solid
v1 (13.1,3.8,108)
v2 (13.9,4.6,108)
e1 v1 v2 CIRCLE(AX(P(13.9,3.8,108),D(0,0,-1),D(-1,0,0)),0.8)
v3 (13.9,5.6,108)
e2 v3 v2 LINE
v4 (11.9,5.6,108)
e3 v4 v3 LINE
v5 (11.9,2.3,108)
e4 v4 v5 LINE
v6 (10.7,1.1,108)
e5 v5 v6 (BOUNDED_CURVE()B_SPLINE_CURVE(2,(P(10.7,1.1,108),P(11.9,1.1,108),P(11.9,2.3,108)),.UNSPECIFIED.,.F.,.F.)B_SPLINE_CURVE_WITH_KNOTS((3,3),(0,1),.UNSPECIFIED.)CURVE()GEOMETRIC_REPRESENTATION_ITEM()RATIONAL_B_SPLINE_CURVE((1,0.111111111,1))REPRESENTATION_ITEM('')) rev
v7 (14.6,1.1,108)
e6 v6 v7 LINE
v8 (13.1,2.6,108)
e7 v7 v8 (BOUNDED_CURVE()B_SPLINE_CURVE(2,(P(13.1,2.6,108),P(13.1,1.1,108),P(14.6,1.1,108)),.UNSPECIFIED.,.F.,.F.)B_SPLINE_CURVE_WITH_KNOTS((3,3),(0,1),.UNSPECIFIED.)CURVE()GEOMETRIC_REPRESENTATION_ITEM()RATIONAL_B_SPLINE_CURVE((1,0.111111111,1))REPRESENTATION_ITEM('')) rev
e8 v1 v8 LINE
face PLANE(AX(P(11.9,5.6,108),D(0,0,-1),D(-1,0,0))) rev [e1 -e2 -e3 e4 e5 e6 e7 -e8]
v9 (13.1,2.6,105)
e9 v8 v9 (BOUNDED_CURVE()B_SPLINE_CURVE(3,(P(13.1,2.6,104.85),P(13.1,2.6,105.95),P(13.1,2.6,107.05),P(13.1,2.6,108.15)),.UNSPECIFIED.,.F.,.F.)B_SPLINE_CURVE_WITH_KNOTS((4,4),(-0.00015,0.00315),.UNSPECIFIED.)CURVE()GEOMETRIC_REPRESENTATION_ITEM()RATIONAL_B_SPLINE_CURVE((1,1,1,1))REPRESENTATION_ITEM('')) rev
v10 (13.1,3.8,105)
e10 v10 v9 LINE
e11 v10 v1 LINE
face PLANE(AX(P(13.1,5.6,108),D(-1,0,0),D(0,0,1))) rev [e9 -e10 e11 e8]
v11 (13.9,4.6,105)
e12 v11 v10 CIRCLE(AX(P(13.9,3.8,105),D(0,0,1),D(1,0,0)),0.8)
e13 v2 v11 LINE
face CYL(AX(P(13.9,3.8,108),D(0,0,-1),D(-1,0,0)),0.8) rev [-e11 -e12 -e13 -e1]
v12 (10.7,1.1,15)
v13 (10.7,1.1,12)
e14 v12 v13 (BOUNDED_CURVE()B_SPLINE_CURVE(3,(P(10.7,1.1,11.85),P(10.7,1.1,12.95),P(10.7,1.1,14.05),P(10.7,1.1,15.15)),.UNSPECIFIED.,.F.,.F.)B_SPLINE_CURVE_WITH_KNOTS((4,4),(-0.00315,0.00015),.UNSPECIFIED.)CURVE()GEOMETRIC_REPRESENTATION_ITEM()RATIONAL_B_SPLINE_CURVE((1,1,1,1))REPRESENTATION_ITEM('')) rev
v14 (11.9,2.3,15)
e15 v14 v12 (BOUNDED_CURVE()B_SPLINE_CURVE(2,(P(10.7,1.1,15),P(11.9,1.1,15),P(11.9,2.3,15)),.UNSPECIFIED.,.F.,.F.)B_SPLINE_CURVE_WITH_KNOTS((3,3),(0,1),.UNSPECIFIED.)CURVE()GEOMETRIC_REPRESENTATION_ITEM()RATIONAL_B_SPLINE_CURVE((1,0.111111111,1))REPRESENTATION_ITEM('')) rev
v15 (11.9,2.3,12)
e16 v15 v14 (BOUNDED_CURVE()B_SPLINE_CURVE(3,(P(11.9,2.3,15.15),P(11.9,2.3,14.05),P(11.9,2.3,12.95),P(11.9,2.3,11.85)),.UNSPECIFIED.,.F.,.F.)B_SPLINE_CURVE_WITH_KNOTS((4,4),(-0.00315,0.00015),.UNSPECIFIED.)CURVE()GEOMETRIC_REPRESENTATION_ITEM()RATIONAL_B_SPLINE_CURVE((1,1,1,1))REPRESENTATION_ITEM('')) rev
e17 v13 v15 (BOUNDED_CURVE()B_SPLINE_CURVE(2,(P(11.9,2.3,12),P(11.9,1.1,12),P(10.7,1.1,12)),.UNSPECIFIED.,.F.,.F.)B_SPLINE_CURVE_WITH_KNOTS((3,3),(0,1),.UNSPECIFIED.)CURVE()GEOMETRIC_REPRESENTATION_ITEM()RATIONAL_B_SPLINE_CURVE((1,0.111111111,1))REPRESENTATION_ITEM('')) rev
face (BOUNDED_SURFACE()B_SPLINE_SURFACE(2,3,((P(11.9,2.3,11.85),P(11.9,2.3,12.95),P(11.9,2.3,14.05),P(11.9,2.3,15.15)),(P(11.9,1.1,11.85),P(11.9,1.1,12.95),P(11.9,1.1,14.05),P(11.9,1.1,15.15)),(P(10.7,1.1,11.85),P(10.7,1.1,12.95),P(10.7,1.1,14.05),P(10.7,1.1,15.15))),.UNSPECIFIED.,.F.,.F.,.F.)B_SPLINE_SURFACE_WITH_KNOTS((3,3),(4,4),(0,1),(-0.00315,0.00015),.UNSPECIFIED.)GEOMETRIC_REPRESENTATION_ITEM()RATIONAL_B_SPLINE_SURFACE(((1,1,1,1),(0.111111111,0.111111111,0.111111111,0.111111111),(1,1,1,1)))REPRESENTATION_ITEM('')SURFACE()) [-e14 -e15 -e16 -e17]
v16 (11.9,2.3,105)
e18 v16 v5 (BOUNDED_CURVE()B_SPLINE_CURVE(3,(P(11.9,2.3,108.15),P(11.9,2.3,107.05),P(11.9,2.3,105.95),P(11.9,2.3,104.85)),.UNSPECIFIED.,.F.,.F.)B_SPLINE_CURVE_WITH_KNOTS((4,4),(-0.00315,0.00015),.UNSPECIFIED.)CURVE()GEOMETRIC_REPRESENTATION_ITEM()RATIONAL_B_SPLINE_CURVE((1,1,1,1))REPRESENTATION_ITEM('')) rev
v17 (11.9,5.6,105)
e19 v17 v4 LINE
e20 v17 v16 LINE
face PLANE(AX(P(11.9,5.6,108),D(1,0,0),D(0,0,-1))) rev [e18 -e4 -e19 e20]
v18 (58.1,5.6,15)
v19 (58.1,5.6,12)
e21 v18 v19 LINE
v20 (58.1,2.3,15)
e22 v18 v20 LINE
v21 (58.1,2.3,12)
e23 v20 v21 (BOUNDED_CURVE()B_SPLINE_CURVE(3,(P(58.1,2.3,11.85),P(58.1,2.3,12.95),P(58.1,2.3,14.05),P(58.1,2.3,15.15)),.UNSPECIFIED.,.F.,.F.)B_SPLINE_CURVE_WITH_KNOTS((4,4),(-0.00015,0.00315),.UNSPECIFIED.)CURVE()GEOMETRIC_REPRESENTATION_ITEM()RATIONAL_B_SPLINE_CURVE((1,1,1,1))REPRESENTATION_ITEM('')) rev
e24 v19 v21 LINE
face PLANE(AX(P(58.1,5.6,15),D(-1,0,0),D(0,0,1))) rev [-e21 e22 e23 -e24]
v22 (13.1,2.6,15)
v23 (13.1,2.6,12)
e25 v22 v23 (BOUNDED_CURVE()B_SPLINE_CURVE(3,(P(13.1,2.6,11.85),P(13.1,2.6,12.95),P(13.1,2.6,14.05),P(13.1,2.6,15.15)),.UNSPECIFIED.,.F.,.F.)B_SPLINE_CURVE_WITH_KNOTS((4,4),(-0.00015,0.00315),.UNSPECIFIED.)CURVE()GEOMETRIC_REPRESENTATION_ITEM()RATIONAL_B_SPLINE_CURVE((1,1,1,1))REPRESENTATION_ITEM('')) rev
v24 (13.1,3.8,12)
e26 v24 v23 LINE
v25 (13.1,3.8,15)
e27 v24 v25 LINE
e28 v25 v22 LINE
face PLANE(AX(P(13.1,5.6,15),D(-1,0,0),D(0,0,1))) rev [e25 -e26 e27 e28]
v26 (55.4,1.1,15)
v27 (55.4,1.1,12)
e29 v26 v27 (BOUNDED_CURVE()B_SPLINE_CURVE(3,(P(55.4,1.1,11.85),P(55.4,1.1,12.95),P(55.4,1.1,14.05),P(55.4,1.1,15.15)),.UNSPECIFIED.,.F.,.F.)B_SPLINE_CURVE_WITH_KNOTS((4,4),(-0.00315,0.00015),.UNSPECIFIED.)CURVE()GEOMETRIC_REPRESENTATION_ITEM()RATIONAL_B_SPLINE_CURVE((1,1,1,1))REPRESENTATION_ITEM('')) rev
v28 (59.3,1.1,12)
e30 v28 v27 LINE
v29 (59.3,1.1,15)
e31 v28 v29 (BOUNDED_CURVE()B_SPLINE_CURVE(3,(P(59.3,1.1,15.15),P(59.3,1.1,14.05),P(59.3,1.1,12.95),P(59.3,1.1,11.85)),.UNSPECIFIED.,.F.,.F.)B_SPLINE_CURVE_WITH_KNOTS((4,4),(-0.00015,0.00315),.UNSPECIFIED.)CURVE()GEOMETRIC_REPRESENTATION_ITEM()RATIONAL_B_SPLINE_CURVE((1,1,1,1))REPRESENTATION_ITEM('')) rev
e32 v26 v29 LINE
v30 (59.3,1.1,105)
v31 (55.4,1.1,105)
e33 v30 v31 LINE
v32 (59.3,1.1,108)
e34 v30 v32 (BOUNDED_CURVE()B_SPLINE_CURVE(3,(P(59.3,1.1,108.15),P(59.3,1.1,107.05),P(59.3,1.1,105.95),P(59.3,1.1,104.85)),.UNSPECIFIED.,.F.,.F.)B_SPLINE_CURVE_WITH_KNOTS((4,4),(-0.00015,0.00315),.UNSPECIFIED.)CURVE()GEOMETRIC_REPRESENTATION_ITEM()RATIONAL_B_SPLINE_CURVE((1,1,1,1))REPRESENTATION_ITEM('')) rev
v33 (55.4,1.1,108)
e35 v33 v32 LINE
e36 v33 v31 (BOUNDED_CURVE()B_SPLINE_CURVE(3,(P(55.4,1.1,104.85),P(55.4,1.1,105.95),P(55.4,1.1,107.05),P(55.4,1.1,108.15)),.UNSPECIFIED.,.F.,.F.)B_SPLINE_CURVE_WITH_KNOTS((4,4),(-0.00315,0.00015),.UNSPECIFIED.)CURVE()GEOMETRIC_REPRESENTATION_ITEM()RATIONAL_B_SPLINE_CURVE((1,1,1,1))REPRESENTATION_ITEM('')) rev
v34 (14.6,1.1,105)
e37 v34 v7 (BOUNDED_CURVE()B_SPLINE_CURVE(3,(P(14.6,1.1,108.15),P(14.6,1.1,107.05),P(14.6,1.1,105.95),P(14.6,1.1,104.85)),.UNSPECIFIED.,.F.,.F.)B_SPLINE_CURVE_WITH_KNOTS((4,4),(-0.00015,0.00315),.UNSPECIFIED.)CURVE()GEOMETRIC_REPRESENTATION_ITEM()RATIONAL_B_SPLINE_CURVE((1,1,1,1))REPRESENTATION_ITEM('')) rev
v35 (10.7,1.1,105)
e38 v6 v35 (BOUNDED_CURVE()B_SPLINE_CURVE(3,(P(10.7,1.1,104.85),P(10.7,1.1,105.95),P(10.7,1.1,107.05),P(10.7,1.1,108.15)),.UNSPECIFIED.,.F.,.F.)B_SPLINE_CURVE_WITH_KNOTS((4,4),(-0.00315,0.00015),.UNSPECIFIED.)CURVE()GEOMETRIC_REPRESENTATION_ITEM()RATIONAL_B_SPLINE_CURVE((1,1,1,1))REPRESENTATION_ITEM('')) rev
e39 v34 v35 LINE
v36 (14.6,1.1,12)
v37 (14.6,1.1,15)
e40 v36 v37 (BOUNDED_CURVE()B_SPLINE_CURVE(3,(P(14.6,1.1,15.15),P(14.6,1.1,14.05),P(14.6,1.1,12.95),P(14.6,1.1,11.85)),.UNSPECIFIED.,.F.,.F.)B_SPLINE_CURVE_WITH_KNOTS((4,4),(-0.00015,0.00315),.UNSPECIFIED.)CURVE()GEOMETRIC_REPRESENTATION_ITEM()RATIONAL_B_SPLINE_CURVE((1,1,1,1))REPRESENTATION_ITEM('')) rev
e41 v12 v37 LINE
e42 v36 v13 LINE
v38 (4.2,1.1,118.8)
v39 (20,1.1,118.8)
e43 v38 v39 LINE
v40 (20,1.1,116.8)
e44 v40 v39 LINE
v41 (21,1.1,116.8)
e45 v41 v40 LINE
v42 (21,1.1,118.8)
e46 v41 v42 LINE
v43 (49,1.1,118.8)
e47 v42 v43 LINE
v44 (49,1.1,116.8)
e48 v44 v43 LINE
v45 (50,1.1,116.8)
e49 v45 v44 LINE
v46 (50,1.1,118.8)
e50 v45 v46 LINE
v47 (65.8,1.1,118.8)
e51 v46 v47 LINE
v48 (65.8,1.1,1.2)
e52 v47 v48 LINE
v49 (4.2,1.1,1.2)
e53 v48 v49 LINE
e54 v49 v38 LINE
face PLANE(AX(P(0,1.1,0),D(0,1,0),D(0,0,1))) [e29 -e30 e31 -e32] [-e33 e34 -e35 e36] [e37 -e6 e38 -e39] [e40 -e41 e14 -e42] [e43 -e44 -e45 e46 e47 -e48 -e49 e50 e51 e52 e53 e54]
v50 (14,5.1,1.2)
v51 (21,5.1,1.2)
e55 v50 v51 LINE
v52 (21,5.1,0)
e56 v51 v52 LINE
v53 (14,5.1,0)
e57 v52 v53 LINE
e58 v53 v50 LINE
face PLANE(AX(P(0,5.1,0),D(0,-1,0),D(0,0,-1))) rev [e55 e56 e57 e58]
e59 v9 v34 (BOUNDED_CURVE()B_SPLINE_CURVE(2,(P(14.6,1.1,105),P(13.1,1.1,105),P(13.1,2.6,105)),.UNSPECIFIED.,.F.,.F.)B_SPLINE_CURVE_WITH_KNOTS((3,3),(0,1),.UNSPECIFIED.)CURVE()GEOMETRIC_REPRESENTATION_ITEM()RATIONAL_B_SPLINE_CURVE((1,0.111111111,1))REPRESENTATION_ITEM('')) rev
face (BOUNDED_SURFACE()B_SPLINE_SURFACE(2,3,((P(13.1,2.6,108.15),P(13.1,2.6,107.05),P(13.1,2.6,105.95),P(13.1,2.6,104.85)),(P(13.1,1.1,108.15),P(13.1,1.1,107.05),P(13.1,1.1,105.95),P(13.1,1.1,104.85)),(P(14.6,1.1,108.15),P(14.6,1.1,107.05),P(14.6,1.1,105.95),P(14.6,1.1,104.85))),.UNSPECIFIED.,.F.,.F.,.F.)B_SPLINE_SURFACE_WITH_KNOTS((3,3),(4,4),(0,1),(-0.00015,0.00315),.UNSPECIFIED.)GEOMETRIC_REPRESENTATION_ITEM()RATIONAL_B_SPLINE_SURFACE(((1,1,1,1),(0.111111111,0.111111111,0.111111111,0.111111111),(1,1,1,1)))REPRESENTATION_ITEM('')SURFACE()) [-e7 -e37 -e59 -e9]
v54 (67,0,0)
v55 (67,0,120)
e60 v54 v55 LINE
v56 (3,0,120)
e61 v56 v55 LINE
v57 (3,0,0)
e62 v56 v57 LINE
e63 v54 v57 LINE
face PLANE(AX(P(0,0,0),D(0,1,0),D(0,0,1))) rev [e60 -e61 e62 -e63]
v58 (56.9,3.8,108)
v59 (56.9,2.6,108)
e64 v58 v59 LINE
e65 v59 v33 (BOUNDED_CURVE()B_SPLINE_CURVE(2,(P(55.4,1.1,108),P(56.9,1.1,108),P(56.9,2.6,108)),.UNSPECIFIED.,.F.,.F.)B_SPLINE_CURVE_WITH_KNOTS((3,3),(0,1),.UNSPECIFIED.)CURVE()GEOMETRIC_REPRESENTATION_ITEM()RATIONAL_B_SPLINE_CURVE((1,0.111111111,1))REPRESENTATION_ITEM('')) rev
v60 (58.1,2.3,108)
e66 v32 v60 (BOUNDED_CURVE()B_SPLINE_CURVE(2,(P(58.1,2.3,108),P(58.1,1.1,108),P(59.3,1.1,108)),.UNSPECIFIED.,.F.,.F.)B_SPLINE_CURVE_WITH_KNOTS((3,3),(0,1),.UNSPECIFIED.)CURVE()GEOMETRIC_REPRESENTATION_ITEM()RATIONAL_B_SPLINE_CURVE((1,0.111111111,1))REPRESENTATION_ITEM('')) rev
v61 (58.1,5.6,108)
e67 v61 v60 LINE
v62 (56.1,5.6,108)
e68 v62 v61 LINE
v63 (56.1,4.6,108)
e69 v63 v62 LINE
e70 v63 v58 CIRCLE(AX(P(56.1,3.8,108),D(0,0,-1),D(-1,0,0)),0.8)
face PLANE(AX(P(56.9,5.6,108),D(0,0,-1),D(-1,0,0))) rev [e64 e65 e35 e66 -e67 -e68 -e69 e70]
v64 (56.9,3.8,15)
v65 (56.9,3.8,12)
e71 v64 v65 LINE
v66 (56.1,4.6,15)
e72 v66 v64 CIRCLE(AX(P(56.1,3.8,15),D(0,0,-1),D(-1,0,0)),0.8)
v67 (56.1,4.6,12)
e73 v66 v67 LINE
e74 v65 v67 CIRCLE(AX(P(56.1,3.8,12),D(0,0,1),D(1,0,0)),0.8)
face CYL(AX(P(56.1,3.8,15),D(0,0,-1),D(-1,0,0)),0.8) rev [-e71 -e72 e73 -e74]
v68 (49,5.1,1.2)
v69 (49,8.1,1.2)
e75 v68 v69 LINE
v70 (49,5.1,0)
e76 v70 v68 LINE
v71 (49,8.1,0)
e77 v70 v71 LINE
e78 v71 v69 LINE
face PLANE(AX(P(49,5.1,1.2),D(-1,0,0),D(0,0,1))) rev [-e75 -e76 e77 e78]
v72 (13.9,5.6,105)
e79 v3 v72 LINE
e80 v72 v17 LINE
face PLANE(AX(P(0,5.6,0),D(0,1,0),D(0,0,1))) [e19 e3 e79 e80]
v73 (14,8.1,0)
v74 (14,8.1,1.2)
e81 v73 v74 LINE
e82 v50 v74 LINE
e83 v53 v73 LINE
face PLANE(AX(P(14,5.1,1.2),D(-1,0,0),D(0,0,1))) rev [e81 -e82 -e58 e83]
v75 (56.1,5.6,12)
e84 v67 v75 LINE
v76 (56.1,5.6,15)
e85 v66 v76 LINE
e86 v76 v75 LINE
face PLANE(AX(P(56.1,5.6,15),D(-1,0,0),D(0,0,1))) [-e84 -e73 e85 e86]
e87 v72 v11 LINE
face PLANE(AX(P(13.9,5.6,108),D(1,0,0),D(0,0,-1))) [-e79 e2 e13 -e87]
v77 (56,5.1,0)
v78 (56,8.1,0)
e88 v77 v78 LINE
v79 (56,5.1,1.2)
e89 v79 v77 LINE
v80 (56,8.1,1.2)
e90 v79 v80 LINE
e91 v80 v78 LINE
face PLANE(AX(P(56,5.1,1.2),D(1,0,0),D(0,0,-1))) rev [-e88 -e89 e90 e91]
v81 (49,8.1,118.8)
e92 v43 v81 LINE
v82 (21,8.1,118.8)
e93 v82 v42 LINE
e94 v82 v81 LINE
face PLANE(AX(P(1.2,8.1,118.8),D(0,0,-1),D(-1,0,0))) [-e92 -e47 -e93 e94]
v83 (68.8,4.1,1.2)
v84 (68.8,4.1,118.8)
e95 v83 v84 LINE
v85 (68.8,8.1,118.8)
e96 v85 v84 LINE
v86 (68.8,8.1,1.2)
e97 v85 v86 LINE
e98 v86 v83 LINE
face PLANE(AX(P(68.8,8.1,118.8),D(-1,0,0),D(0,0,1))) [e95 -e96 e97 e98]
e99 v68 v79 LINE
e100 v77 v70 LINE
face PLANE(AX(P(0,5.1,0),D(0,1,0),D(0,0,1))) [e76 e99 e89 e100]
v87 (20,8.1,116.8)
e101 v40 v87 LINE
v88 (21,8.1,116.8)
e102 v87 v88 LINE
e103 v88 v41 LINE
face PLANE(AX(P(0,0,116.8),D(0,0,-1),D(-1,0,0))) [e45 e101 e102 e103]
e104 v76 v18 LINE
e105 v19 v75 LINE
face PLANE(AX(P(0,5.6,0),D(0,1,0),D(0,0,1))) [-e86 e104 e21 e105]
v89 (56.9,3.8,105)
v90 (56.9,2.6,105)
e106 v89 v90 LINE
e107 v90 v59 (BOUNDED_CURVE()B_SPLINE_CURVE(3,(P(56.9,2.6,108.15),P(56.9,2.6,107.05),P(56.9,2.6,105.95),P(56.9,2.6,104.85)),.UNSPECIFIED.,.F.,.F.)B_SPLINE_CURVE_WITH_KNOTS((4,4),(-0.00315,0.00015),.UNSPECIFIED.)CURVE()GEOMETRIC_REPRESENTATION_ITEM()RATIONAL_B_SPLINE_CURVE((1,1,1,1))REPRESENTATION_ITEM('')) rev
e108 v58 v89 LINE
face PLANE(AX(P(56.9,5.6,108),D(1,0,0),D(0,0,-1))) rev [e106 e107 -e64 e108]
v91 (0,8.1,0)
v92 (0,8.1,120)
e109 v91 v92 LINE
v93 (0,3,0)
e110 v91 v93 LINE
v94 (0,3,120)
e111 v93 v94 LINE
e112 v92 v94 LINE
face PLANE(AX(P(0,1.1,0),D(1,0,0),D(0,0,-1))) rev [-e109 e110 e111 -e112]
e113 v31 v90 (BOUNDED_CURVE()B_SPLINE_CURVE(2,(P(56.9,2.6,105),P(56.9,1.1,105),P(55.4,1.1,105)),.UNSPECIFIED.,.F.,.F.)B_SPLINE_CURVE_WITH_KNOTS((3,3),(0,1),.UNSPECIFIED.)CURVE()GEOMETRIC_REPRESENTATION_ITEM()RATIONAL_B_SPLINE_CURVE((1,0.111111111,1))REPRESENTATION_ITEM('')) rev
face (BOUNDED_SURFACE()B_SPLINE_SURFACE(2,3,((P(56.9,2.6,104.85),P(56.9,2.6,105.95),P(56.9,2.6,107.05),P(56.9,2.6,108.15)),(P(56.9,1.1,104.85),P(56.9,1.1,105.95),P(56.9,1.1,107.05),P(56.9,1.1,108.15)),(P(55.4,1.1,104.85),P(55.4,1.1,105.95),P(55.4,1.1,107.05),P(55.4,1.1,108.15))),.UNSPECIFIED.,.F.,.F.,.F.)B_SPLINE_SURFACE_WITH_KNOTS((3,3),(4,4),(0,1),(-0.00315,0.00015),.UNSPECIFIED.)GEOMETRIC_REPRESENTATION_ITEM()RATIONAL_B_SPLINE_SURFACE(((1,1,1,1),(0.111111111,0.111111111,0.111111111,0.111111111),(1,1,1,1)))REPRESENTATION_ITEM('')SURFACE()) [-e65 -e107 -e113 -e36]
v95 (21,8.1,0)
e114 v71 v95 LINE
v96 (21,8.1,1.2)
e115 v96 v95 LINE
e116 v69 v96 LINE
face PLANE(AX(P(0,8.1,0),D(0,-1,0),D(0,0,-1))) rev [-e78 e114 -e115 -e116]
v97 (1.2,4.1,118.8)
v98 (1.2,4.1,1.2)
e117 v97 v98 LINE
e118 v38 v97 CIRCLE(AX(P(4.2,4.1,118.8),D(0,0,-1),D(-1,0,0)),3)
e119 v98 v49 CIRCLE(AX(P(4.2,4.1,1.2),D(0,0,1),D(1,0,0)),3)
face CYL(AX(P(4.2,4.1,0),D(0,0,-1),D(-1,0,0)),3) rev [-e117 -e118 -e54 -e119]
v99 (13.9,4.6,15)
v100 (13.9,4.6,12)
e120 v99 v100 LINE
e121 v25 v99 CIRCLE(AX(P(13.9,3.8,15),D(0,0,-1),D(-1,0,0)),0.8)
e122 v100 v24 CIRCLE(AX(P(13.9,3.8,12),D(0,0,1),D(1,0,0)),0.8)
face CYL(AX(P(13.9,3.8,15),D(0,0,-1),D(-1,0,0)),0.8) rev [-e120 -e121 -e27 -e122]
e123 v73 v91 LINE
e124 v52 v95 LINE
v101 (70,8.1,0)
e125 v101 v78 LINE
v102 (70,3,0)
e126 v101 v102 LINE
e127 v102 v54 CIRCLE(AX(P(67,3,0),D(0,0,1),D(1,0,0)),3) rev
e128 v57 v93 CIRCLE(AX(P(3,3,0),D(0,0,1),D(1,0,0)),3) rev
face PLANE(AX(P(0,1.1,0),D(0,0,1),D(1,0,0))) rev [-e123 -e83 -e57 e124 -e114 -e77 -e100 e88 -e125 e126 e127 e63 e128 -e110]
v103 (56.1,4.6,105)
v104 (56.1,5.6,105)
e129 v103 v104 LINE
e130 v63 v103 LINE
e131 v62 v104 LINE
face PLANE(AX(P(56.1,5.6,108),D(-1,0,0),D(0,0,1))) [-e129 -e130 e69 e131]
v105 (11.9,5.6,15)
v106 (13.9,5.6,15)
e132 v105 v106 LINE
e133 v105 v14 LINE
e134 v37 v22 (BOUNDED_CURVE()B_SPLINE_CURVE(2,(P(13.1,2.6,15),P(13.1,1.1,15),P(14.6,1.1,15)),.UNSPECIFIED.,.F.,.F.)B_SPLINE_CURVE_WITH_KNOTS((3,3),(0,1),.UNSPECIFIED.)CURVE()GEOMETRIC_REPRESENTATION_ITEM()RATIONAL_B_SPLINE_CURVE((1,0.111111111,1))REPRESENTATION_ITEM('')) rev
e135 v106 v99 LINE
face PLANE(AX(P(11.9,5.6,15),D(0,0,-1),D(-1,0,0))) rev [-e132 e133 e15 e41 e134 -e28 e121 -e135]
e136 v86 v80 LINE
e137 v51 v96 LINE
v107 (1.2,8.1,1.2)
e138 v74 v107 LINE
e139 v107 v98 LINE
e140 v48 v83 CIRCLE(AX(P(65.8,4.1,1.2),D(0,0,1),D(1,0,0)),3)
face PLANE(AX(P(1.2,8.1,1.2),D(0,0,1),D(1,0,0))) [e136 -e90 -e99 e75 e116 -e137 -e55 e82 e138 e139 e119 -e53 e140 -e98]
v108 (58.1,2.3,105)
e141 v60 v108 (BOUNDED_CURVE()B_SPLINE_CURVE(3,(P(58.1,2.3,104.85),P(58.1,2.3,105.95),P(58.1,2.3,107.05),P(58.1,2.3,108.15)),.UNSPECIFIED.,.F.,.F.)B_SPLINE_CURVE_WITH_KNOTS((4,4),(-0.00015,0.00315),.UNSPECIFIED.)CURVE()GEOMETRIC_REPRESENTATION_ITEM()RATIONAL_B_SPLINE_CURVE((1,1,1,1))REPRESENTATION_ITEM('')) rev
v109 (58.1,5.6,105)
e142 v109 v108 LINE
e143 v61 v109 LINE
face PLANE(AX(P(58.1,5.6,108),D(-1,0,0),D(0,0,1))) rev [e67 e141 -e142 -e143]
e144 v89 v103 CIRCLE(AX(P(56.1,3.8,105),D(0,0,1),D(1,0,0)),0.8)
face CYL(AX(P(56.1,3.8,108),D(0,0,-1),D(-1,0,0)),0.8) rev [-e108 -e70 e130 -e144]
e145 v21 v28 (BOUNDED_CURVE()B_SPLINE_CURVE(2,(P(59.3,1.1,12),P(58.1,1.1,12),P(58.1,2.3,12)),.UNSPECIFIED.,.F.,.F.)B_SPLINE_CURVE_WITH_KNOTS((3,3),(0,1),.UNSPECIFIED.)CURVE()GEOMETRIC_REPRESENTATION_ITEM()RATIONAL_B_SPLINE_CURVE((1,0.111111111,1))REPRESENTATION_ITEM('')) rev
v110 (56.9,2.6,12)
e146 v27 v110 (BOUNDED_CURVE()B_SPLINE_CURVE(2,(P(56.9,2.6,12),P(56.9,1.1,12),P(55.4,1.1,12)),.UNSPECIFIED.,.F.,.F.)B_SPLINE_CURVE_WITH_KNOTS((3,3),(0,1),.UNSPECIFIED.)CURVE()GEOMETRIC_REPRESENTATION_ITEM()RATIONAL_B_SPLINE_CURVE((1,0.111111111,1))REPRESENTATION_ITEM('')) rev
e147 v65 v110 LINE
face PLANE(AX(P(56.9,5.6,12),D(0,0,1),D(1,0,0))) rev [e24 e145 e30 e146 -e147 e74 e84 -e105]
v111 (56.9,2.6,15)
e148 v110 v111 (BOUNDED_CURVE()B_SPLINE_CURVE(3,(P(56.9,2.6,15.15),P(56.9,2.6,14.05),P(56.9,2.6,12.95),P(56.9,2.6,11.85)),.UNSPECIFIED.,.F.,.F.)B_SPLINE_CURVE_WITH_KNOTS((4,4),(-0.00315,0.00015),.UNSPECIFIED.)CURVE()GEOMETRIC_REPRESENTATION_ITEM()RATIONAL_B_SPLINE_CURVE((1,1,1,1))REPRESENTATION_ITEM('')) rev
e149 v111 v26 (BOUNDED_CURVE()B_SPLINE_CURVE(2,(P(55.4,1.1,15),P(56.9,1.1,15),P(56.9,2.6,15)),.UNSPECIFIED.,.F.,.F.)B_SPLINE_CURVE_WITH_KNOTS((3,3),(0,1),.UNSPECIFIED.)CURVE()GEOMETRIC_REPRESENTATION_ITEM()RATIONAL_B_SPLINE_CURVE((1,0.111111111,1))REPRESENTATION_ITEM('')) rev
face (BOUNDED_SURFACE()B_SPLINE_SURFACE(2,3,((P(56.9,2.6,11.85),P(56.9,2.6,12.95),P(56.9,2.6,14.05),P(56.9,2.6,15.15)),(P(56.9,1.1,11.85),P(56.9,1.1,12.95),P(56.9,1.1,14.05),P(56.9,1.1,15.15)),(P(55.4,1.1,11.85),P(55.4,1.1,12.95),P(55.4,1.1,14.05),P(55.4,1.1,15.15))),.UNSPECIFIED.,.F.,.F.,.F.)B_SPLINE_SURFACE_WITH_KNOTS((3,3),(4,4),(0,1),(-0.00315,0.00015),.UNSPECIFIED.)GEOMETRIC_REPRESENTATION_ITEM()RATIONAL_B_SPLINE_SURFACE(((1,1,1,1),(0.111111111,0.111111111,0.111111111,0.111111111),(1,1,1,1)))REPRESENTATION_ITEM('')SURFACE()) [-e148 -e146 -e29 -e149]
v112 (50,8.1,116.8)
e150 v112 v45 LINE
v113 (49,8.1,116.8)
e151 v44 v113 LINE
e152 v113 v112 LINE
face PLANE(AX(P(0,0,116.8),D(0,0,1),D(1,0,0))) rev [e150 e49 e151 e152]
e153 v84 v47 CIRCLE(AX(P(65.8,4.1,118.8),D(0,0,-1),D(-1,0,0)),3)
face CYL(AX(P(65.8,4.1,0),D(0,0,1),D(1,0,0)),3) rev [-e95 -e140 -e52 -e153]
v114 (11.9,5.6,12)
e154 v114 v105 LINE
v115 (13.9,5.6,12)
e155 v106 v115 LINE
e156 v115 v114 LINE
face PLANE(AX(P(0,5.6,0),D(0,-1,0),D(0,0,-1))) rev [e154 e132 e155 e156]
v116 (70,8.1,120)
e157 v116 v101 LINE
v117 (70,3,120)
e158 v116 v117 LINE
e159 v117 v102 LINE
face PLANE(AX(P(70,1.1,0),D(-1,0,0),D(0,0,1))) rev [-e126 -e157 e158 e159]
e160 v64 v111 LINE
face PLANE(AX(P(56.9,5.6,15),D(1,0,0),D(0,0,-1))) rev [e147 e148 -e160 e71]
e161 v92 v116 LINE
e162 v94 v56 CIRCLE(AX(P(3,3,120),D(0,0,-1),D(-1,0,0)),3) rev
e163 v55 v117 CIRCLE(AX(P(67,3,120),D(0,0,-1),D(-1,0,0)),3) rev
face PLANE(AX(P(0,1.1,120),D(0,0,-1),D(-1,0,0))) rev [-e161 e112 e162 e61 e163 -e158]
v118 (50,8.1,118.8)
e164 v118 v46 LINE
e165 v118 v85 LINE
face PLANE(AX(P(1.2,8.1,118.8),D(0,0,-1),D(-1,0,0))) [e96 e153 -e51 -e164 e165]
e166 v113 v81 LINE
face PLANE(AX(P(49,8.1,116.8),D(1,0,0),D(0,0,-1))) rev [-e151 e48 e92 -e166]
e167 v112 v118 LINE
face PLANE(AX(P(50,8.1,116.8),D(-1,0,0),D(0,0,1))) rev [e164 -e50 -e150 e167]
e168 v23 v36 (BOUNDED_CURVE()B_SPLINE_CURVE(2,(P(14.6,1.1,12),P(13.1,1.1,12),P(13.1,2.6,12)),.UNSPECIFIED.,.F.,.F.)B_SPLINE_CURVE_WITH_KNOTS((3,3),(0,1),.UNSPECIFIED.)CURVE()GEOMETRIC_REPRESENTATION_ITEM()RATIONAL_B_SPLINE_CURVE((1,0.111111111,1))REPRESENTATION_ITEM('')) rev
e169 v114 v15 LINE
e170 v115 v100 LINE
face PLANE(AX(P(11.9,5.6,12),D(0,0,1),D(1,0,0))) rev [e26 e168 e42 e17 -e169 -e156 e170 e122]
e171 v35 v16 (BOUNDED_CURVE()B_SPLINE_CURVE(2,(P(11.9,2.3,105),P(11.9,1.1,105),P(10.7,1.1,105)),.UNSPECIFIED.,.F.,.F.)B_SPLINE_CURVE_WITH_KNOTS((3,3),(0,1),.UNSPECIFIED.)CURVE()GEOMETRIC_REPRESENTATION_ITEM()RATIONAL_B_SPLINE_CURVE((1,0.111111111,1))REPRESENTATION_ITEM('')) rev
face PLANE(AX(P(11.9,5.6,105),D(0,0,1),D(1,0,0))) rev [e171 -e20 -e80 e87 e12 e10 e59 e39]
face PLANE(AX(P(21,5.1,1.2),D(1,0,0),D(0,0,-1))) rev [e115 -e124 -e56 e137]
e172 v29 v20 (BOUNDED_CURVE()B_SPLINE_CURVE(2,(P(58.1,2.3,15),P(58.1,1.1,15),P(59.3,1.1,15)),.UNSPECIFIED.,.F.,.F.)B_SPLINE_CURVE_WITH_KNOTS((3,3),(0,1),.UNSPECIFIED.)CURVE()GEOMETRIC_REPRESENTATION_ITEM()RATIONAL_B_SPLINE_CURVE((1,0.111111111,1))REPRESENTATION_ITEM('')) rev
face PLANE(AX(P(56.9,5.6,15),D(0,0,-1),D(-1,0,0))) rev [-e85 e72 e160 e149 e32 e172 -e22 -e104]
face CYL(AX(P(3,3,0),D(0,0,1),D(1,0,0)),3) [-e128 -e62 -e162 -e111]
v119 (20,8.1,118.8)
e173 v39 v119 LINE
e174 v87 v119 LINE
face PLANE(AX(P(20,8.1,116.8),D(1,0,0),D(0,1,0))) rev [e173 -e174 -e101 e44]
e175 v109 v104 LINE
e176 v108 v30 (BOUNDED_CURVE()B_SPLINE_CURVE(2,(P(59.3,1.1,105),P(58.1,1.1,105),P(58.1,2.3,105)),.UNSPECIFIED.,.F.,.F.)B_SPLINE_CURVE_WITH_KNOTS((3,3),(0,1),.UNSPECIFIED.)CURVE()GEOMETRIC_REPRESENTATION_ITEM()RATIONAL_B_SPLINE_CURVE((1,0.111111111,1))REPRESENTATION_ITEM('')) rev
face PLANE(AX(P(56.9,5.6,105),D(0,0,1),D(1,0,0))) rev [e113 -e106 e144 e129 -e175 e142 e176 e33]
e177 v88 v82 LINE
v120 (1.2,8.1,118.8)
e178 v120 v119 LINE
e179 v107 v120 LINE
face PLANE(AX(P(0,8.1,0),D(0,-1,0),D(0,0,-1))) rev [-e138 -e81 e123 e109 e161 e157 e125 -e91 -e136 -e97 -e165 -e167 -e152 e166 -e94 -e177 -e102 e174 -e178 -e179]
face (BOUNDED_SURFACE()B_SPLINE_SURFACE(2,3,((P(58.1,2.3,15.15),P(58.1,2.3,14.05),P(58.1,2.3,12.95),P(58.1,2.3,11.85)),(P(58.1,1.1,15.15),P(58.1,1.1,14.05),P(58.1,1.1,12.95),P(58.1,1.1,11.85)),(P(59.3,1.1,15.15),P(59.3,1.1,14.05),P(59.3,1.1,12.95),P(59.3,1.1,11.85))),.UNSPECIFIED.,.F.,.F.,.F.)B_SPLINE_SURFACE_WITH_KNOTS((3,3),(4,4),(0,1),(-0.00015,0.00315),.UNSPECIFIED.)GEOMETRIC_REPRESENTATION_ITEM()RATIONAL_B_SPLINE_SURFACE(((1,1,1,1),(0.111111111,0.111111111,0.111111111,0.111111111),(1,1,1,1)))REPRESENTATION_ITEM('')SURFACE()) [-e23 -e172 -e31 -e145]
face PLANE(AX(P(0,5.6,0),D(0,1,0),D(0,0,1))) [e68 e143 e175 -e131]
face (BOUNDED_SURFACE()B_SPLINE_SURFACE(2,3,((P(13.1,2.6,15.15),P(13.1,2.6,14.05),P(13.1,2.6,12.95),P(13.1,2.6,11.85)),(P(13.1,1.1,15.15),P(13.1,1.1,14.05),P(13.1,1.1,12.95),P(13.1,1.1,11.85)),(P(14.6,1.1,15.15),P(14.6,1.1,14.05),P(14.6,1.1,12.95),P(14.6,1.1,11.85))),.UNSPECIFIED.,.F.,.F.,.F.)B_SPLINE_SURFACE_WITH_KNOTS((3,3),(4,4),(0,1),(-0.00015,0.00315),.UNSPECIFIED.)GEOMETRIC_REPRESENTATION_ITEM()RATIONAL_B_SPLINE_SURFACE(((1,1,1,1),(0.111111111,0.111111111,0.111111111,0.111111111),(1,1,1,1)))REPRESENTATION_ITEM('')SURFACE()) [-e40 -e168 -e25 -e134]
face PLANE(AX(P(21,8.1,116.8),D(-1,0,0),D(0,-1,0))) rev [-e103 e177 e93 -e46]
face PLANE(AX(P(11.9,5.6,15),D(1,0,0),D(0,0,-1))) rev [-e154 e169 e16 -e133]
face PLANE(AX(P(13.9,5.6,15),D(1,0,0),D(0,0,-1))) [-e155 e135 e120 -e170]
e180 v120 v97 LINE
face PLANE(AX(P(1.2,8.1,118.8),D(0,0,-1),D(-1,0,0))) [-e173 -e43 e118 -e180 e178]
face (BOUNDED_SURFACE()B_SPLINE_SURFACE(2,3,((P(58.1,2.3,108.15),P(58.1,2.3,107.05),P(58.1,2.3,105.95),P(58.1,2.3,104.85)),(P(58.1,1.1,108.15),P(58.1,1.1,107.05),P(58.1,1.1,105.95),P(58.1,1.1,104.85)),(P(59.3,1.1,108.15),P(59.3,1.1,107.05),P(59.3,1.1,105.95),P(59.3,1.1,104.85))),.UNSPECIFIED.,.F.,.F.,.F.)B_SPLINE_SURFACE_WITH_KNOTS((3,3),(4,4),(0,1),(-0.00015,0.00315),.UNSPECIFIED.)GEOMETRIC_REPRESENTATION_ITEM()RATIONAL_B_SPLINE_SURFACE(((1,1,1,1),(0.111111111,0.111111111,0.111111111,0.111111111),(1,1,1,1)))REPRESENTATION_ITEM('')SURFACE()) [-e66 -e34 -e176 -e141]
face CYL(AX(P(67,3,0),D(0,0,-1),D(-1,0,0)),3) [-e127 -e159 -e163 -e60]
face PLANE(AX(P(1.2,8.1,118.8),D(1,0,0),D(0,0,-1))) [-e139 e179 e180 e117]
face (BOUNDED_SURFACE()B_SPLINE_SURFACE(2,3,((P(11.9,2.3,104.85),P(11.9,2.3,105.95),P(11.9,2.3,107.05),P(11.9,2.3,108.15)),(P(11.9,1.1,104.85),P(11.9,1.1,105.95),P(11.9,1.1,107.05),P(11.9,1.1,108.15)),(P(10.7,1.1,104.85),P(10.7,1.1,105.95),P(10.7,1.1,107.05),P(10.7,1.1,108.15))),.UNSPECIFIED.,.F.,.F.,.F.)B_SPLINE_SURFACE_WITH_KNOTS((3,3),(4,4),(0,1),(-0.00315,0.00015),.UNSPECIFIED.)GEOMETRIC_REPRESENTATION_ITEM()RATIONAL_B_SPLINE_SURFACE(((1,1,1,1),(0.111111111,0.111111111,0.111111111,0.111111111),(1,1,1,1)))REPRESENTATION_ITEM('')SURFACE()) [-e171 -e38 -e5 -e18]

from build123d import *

# Parameters (mm, degrees)
SKETCH1_W           = 70
SKETCH1_H           = 120
BOSS_EXTRUDE1_DEPTH = 1.1
SKETCH2_W           = 70
SKETCH2_H           = 120
SKETCH2_W_2         = 67.6
SKETCH2_H_2         = 117.6
BOSS_EXTRUDE2_DEPTH = 7
SKETCH3_W           = 1.2
SKETCH3_H           = 3
BOSS_EXTRUDE3_DEPTH = 4.5
SKETCH5_W           = 0.8
SKETCH5_H           = 1
BOSS_EXTRUDE4_DEPTH = 3
SKETCH6_W           = 0.8
SKETCH6_H           = 1
BOSS_EXTRUDE5_DEPTH = 3
SKETCH7_W           = 7
SKETCH7_H           = 1.2
CUT_EXTRUDE1_DEPTH  = 3
SKETCH8_W           = 1
SKETCH8_H           = 7
BOSS_EXTRUDE6_DEPTH = 2
FILLET1_SIZE        = 1.5
FILLET2_SIZE        = 1.2
FILLET3_R           = 0.8
FILLET4_R           = 3


# Some blends are built 0.0001 mm under size
with BuildPart() as part:
    # Sketch1 → Boss-Extrude1 (new body)
    with BuildSketch(Plane(origin=(0, 0, 0), x_dir=(1, 0, 0), z_dir=(0, 1, 0))):
        with Locations((35, -60)):
            Rectangle(SKETCH1_W, SKETCH1_H)
    extrude(amount=BOSS_EXTRUDE1_DEPTH)

    # Sketch2 → Boss-Extrude2 (add)
    with BuildSketch(Plane(origin=(0, 1.1, 0), x_dir=(1, 0, 0), z_dir=(0, 1, 0))):
        with Locations((35, -60)):
            Rectangle(SKETCH2_W, SKETCH2_H)
        with Locations((35, -60)):
            Rectangle(SKETCH2_W_2, SKETCH2_H_2, mode=Mode.SUBTRACT)
    extrude(amount=BOSS_EXTRUDE2_DEPTH)

    # Sketch3 → Boss-Extrude3 (add)
    with BuildSketch(Plane(origin=(0, 1.1, 0), x_dir=(1, 0, 0), z_dir=(0, 1, 0))):
        with Locations((57.5, -13.5)):
            Rectangle(SKETCH3_W, SKETCH3_H)
        with Locations((12.5, -13.5)):
            Rectangle(SKETCH3_W, SKETCH3_H)
        with Locations((57.5, -106.5)):
            Rectangle(SKETCH3_W, SKETCH3_H)
        with Locations((12.5, -106.5)):
            Rectangle(SKETCH3_W, SKETCH3_H)
    extrude(amount=BOSS_EXTRUDE3_DEPTH)

    # Sketch5 → Boss-Extrude4 (add)
    with BuildSketch(Plane(origin=(0, 0, 12), x_dir=(-1, 0, 0), z_dir=(0, 0, -1))):
        with Locations((-56.5, 5.1)):
            Rectangle(SKETCH5_W, SKETCH5_H)
        with Locations((-13.5, 5.1)):
            Rectangle(SKETCH5_W, SKETCH5_H)
    extrude(amount=-BOSS_EXTRUDE4_DEPTH)

    # Sketch6 → Boss-Extrude5 (add)
    with BuildSketch(Plane(origin=(0, 0, 105), x_dir=(-1, 0, 0), z_dir=(0, 0, -1))):
        with Locations((-56.5, 5.1)):
            Rectangle(SKETCH6_W, SKETCH6_H)
        with Locations((-13.5, 5.1)):
            Rectangle(SKETCH6_W, SKETCH6_H)
    extrude(amount=-BOSS_EXTRUDE5_DEPTH)

    # Sketch7 → Cut-Extrude1 (cut)
    with BuildSketch(Plane(origin=(0, 8.1, 0), x_dir=(1, 0, 0), z_dir=(0, 1, 0))):
        with Locations((52.5, -0.6)):
            Rectangle(SKETCH7_W, SKETCH7_H)
        with Locations((17.5, -0.6)):
            Rectangle(SKETCH7_W, SKETCH7_H)
    extrude(amount=-CUT_EXTRUDE1_DEPTH, mode=Mode.SUBTRACT)

    # Sketch8 → Boss-Extrude6 (add)
    with BuildSketch(Plane(origin=(0, 0, 118.8), x_dir=(-1, 0, 0), z_dir=(0, 0, -1))):
        with Locations((-49.5, 4.6)):
            Rectangle(SKETCH8_W, SKETCH8_H)
        with Locations((-20.5, 4.6)):
            Rectangle(SKETCH8_W, SKETCH8_H)
    extrude(amount=BOSS_EXTRUDE6_DEPTH)

    # Fillet1
    # a fillet whose section is not a circle: 1.5 mm, written as the material it adds along each edge
    with BuildSketch(Plane(origin=(13.1, 1.1, 15), x_dir=(1, 0, 0), z_dir=(0, 0, -1))) as fillet1_piece_1:
        with BuildLine():
            Bezier((FILLET1_SIZE, 0), (0, 0), (0, -FILLET1_SIZE), weights=[1, 0.111111111, 1])
            Line((0, -FILLET1_SIZE), (0, 0))
            Line((0, 0), (FILLET1_SIZE, 0))
        make_face()
    extrude(amount=3)
    with BuildSketch(Plane(origin=(56.9, 1.1, 15), x_dir=(-1, 0, 0), z_dir=(0, 0, -1)), Plane(origin=(56.9, 1.1, 108), x_dir=(-1, 0, 0), z_dir=(0, 0, -1)), Plane(origin=(13.1, 1.1, 105), x_dir=(1, 0, 0), z_dir=(0, 0, 1))) as fillet1_piece_2:
        with BuildLine():
            Bezier((FILLET1_SIZE, 0), (0, 0), (0, FILLET1_SIZE), weights=[1, 0.111111111, 1])
            Line((0, FILLET1_SIZE), (0, 0))
            Line((0, 0), (FILLET1_SIZE, 0))
        make_face()
    extrude(amount=3)

    # Fillet2
    # a fillet whose section is not a circle: 1.2 mm, written as the material it adds along each edge
    with BuildSketch(Plane(origin=(11.9, 1.1, 12), x_dir=(-1, 0, 0), z_dir=(0, 0, 1)), Plane(origin=(58.1, 1.1, 12), x_dir=(0, 1, 0), z_dir=(0, 0, 1))) as fillet2_piece_1:
        with BuildLine():
            Bezier((FILLET2_SIZE, 0), (0, 0), (0, -FILLET2_SIZE), weights=[1, 0.111111111, 1])
            Line((0, -FILLET2_SIZE), (-FILLET2_SIZE * 0.02, -FILLET2_SIZE))
            Line((-FILLET2_SIZE * 0.02, -FILLET2_SIZE), (-FILLET2_SIZE * 0.02, FILLET2_SIZE * 0.02))
            Line((-FILLET2_SIZE * 0.02, FILLET2_SIZE * 0.02), (FILLET2_SIZE, FILLET2_SIZE * 0.02))
            Line((FILLET2_SIZE, FILLET2_SIZE * 0.02), (FILLET2_SIZE, 0))
        make_face()
    extrude(amount=3)
    with BuildSketch(Plane(origin=(58.1, 1.1, 105), x_dir=(1, 0, 0), z_dir=(0, 0, 1)), Plane(origin=(11.9, 1.1, 108), x_dir=(-1, 0, 0), z_dir=(0, 0, -1))) as fillet2_piece_2:
        with BuildLine():
            Bezier((FILLET2_SIZE, 0), (0, 0), (0, FILLET2_SIZE), weights=[1, 0.111111111, 1])
            Line((0, FILLET2_SIZE), (-FILLET2_SIZE * 0.02, FILLET2_SIZE))
            Line((-FILLET2_SIZE * 0.02, FILLET2_SIZE), (-FILLET2_SIZE * 0.02, -FILLET2_SIZE * 0.02))
            Line((-FILLET2_SIZE * 0.02, -FILLET2_SIZE * 0.02), (FILLET2_SIZE, -FILLET2_SIZE * 0.02))
            Line((FILLET2_SIZE, -FILLET2_SIZE * 0.02), (FILLET2_SIZE, 0))
        make_face()
    extrude(amount=3)

    # Fillet3
    fillet3_edges = [part.edges().sort_by_distance(p)[0] for p in [
        (56.9, 4.6, 106.5),
        (56.9, 4.6, 13.5),
        (13.1, 4.6, 13.5),
        (13.1, 4.6, 106.5),
    ]]
    fillet(fillet3_edges, radius=FILLET3_R - 0.0001)  # a hair under: the kernel refuses the full size

    # Fillet4
    fillet4_edges = [part.edges().sort_by_distance(p)[0] for p in [
        (1.2, 1.1, 60),
        (68.8, 1.1, 60),
        (70, 0, 60),
        (0, 0, 60),
    ]]
    fillet(fillet4_edges, radius=FILLET4_R)


solid = part.part
